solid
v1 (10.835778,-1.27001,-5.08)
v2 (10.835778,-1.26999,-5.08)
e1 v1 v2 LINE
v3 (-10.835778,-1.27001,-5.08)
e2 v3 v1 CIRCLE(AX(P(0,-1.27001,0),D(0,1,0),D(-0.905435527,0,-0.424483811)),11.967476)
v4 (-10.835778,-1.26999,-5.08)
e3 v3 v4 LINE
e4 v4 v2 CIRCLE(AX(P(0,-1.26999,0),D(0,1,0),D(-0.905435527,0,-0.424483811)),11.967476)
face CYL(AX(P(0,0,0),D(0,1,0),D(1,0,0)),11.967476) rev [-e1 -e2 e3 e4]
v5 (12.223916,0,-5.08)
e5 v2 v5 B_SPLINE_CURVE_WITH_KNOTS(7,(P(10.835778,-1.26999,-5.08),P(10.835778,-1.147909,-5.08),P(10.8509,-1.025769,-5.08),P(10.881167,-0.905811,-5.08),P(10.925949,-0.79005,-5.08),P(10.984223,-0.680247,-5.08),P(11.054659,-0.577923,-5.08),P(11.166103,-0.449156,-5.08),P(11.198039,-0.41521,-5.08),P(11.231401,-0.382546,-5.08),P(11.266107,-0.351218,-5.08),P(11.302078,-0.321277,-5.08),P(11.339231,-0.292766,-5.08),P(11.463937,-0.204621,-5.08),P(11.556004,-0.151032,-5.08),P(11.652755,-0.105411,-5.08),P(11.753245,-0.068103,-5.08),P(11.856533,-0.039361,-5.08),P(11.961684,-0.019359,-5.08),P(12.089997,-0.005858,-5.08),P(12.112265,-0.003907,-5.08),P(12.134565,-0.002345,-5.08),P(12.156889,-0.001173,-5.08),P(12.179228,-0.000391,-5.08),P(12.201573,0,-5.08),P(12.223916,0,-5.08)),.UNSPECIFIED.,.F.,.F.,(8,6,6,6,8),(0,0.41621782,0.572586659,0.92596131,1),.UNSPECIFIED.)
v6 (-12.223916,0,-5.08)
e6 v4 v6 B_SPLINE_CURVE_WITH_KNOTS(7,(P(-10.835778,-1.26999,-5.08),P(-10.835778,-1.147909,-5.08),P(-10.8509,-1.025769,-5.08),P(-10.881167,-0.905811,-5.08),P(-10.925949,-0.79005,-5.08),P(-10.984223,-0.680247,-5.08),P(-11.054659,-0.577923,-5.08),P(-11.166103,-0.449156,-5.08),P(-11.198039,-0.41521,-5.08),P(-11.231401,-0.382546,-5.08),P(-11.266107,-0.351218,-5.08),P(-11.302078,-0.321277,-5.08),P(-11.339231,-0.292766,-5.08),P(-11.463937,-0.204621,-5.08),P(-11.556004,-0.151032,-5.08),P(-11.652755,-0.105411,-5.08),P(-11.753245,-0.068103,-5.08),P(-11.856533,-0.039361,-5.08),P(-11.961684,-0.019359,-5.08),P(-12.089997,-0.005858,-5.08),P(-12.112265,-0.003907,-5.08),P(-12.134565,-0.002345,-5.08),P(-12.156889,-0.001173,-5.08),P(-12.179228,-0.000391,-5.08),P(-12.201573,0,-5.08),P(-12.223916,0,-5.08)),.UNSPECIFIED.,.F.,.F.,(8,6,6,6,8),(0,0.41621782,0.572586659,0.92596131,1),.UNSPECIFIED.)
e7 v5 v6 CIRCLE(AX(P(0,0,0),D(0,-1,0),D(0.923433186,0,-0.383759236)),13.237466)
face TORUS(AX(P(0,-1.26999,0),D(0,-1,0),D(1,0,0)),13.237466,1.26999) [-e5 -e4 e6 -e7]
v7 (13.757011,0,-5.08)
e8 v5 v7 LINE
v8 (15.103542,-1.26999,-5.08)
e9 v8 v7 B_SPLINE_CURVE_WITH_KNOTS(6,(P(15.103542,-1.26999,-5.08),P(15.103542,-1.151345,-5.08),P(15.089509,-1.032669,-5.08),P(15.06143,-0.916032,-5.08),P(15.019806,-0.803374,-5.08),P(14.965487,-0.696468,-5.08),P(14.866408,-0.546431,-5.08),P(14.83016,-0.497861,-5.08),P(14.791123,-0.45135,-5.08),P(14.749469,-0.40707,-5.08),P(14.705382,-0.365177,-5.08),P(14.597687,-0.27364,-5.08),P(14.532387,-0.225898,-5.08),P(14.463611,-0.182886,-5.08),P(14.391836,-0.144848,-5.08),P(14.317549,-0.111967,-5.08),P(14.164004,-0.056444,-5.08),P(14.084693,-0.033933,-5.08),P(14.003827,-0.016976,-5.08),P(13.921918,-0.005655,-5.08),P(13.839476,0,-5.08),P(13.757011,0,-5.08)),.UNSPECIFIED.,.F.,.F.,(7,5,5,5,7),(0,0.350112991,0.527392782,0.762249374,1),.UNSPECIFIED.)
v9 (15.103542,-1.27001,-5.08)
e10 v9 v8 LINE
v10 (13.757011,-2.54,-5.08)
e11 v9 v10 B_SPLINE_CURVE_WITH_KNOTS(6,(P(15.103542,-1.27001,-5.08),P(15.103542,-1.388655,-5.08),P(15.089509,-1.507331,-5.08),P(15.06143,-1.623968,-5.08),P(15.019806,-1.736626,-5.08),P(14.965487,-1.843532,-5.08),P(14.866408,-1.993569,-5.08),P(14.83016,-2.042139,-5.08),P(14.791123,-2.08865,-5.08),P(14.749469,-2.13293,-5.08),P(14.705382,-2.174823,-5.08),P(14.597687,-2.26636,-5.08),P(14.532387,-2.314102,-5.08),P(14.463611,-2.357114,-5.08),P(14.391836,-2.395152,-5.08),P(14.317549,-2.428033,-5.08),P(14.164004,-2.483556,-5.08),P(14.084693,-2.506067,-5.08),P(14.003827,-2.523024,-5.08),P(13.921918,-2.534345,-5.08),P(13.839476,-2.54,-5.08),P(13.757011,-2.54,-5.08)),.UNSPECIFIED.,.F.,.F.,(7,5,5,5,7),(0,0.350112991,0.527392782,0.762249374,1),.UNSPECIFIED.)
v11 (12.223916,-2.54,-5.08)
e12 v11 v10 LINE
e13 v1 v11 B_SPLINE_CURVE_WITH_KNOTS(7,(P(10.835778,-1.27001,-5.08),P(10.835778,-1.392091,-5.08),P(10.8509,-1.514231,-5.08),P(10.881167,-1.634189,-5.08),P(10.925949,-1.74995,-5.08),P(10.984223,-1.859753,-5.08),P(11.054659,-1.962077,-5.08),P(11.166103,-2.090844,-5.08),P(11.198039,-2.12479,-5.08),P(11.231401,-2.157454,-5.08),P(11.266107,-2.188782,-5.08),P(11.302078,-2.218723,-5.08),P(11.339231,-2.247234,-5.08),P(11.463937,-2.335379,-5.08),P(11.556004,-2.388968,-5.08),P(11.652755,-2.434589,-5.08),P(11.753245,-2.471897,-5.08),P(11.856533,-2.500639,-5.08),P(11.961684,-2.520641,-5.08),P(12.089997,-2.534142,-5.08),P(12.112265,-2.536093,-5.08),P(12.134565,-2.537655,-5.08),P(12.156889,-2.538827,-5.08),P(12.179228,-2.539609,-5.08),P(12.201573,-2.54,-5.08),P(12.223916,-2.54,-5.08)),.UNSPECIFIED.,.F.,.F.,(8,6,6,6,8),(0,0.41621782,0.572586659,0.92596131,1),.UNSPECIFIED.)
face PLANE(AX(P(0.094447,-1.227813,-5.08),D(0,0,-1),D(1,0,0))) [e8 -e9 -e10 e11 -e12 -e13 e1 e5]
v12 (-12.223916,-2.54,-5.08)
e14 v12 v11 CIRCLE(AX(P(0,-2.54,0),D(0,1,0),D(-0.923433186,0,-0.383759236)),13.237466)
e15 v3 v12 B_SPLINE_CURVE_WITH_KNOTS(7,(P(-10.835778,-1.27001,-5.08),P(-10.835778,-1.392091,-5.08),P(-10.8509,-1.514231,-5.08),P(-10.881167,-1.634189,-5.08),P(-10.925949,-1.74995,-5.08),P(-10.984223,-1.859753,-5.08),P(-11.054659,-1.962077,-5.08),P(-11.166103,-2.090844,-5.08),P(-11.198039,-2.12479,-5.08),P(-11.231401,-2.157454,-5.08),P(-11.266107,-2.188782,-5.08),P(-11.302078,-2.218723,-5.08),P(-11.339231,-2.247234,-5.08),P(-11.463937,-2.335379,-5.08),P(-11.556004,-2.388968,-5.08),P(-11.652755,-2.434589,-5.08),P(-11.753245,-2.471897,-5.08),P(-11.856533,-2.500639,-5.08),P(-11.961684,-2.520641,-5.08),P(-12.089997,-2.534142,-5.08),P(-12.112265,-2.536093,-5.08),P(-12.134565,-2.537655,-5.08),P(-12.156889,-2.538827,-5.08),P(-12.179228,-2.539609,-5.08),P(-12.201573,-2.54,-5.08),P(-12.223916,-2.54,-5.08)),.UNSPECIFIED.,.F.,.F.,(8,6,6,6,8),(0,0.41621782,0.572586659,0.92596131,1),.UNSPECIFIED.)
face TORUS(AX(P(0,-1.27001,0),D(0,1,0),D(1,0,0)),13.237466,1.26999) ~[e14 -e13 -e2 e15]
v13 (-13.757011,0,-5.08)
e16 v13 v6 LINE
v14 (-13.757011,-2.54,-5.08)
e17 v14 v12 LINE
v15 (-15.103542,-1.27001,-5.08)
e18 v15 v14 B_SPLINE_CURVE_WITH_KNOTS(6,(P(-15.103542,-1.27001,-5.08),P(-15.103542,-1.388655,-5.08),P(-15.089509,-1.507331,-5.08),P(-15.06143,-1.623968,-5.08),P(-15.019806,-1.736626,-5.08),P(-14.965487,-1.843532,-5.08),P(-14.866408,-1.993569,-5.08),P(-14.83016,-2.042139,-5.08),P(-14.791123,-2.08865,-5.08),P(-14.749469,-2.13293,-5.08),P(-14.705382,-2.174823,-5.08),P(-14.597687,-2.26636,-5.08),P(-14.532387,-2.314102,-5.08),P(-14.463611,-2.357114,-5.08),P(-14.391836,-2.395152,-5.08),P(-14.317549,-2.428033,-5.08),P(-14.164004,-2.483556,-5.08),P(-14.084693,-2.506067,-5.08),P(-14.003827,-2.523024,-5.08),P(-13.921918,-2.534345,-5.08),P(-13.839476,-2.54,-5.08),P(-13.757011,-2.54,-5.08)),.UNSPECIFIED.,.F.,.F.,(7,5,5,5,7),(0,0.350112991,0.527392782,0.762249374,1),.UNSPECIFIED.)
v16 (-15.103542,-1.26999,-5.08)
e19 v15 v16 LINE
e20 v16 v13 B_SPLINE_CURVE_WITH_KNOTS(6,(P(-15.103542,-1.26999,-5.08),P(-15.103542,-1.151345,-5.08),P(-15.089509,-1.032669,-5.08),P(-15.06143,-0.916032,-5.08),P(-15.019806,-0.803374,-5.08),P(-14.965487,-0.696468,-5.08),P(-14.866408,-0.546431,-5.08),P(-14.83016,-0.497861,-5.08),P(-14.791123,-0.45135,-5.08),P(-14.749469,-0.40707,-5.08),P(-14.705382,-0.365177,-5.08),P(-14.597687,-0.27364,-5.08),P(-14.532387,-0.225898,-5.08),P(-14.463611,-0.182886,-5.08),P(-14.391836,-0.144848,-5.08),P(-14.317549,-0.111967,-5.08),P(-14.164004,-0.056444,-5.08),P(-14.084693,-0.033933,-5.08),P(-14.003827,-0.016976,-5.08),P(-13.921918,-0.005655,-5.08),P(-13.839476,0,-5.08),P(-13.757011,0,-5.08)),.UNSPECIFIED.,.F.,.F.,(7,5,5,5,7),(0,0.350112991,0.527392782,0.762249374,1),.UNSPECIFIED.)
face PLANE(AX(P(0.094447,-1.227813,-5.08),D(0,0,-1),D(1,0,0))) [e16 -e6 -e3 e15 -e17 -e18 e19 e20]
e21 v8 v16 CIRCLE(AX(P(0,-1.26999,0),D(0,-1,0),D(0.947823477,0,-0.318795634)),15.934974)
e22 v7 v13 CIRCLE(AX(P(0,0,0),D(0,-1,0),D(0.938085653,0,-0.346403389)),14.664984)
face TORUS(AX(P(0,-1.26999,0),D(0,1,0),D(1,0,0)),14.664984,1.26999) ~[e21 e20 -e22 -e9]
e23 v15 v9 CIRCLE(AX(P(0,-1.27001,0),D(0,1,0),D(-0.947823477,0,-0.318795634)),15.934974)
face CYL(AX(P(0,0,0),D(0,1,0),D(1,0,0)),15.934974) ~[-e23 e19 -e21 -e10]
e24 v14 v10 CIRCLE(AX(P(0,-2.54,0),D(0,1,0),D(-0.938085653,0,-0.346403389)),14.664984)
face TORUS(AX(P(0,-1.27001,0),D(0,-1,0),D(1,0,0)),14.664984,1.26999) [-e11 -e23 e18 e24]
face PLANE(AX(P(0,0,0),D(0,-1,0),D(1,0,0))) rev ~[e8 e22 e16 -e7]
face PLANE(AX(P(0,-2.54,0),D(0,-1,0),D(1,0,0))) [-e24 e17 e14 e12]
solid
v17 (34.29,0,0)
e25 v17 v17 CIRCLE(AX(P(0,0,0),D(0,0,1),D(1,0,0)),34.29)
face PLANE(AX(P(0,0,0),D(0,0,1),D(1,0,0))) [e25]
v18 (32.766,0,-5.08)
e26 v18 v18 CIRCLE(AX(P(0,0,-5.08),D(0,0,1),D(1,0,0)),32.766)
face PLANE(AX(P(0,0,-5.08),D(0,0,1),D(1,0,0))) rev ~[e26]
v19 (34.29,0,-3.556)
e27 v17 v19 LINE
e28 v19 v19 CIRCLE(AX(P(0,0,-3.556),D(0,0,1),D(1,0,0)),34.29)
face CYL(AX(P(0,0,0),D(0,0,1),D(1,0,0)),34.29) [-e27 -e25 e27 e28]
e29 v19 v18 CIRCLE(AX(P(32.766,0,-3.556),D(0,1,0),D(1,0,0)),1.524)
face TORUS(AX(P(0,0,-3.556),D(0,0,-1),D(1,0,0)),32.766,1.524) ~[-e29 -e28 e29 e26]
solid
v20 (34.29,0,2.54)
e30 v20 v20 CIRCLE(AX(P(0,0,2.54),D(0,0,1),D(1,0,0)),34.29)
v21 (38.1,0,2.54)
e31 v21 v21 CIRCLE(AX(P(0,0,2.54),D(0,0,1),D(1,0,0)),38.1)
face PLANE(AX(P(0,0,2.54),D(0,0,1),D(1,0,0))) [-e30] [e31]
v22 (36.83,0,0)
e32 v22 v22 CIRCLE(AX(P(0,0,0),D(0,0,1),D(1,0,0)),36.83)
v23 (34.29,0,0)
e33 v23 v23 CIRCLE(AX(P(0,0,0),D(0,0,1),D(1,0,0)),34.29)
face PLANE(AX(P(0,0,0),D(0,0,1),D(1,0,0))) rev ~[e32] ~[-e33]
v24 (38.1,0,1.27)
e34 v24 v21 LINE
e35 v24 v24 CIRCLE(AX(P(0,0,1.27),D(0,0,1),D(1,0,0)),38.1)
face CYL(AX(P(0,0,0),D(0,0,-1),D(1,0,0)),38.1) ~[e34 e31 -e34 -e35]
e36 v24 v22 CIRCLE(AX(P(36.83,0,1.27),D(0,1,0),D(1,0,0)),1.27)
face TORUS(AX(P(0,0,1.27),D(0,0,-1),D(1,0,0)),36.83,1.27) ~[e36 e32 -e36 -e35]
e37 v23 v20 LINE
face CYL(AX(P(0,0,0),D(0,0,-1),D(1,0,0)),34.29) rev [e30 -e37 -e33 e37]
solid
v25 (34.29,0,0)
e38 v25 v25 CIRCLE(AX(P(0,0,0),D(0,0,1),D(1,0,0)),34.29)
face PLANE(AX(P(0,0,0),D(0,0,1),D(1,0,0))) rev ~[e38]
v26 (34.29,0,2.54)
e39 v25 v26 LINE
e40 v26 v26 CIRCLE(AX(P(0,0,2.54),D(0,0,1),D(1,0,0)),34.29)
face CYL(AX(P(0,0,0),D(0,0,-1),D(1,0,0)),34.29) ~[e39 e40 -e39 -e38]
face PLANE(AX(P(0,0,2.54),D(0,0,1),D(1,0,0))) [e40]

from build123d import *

# Parameters (mm, degrees)
F0_R      = 38.1
F0_R_2    = 34.29
F1_DEPTH  = 2.54
F2_R      = 1.27
F3_R      = 15.9349735513
F3_R_2    = 11.9674764151
F4_DEPTH  = 2.54
F5_R      = 1.26999
F6_DEPTH  = 5.08
F7_DEPTH  = 2.54
F8_R      = 1.524
F9_W      = 32.174937427
F9_H      = 8.878018707
F10_DEPTH = 17.2739680856


# Not quite as in the source:
# - a fillet or chamfer is up to 0.001 mm smaller than in the source, because OpenCascade refuses the exact size


with BuildPart() as f1:
    # F0 (on Top) → F1 (new body)
    with BuildSketch(Plane.XY):
        Circle(F0_R)
        Circle(F0_R_2, mode=Mode.SUBTRACT)
    extrude(amount=F1_DEPTH)

    # F2
    f2_edges = [f1.edges().sort_by_distance(p)[0] for p in [
        (-38.1, 0, 0),
    ]]
    fillet(f2_edges, radius=F2_R)


with BuildPart() as f4:
    # F3 (on Front) → F4 (new body)
    with BuildSketch(Plane.XZ):
        Circle(F3_R)
        Circle(F3_R_2, mode=Mode.SUBTRACT)
    extrude(amount=F4_DEPTH)

    # F5 (radius 1.27 in the source; OpenCascade refuses exactly that, so slightly less here)
    f5_edges = [f4.edges().sort_by_distance(p)[0] for p in [
        (-15.934974, -2.54, 0),
        (-11.967476, 0, 0),
        (-15.934974, 0, 0),
        (-11.967476, -2.54, 0),
    ]]
    fillet(f5_edges, radius=F5_R)

    # F9 (on face) → F10 (cut)
    with BuildSketch(Plane(origin=(0, 0, -5.08), x_dir=(1, 0, 0), z_dir=(0, 0, -1))):
        with Locations((0.0944472849, 1.2278128415)):
            Rectangle(F9_W, F9_H)
    extrude(amount=F10_DEPTH, mode=Mode.SUBTRACT)


with BuildPart() as f6:
    # F0 (on Top) → F6 (new body)
    with BuildSketch(Plane.XY):
        Circle(F0_R_2)
    extrude(amount=-F6_DEPTH)

    # F8
    f8_edges = [f6.edges().sort_by_distance(p)[0] for p in [
        (-34.29, 0, -5.08),
    ]]
    fillet(f8_edges, radius=F8_R)


with BuildPart() as f7:
    # F0 (on Top) → F7 (new body)
    with BuildSketch(Plane.XY):
        Circle(F0_R_2)
    extrude(amount=F7_DEPTH)


solid = Compound([f1.part, f4.part, f6.part, f7.part])
